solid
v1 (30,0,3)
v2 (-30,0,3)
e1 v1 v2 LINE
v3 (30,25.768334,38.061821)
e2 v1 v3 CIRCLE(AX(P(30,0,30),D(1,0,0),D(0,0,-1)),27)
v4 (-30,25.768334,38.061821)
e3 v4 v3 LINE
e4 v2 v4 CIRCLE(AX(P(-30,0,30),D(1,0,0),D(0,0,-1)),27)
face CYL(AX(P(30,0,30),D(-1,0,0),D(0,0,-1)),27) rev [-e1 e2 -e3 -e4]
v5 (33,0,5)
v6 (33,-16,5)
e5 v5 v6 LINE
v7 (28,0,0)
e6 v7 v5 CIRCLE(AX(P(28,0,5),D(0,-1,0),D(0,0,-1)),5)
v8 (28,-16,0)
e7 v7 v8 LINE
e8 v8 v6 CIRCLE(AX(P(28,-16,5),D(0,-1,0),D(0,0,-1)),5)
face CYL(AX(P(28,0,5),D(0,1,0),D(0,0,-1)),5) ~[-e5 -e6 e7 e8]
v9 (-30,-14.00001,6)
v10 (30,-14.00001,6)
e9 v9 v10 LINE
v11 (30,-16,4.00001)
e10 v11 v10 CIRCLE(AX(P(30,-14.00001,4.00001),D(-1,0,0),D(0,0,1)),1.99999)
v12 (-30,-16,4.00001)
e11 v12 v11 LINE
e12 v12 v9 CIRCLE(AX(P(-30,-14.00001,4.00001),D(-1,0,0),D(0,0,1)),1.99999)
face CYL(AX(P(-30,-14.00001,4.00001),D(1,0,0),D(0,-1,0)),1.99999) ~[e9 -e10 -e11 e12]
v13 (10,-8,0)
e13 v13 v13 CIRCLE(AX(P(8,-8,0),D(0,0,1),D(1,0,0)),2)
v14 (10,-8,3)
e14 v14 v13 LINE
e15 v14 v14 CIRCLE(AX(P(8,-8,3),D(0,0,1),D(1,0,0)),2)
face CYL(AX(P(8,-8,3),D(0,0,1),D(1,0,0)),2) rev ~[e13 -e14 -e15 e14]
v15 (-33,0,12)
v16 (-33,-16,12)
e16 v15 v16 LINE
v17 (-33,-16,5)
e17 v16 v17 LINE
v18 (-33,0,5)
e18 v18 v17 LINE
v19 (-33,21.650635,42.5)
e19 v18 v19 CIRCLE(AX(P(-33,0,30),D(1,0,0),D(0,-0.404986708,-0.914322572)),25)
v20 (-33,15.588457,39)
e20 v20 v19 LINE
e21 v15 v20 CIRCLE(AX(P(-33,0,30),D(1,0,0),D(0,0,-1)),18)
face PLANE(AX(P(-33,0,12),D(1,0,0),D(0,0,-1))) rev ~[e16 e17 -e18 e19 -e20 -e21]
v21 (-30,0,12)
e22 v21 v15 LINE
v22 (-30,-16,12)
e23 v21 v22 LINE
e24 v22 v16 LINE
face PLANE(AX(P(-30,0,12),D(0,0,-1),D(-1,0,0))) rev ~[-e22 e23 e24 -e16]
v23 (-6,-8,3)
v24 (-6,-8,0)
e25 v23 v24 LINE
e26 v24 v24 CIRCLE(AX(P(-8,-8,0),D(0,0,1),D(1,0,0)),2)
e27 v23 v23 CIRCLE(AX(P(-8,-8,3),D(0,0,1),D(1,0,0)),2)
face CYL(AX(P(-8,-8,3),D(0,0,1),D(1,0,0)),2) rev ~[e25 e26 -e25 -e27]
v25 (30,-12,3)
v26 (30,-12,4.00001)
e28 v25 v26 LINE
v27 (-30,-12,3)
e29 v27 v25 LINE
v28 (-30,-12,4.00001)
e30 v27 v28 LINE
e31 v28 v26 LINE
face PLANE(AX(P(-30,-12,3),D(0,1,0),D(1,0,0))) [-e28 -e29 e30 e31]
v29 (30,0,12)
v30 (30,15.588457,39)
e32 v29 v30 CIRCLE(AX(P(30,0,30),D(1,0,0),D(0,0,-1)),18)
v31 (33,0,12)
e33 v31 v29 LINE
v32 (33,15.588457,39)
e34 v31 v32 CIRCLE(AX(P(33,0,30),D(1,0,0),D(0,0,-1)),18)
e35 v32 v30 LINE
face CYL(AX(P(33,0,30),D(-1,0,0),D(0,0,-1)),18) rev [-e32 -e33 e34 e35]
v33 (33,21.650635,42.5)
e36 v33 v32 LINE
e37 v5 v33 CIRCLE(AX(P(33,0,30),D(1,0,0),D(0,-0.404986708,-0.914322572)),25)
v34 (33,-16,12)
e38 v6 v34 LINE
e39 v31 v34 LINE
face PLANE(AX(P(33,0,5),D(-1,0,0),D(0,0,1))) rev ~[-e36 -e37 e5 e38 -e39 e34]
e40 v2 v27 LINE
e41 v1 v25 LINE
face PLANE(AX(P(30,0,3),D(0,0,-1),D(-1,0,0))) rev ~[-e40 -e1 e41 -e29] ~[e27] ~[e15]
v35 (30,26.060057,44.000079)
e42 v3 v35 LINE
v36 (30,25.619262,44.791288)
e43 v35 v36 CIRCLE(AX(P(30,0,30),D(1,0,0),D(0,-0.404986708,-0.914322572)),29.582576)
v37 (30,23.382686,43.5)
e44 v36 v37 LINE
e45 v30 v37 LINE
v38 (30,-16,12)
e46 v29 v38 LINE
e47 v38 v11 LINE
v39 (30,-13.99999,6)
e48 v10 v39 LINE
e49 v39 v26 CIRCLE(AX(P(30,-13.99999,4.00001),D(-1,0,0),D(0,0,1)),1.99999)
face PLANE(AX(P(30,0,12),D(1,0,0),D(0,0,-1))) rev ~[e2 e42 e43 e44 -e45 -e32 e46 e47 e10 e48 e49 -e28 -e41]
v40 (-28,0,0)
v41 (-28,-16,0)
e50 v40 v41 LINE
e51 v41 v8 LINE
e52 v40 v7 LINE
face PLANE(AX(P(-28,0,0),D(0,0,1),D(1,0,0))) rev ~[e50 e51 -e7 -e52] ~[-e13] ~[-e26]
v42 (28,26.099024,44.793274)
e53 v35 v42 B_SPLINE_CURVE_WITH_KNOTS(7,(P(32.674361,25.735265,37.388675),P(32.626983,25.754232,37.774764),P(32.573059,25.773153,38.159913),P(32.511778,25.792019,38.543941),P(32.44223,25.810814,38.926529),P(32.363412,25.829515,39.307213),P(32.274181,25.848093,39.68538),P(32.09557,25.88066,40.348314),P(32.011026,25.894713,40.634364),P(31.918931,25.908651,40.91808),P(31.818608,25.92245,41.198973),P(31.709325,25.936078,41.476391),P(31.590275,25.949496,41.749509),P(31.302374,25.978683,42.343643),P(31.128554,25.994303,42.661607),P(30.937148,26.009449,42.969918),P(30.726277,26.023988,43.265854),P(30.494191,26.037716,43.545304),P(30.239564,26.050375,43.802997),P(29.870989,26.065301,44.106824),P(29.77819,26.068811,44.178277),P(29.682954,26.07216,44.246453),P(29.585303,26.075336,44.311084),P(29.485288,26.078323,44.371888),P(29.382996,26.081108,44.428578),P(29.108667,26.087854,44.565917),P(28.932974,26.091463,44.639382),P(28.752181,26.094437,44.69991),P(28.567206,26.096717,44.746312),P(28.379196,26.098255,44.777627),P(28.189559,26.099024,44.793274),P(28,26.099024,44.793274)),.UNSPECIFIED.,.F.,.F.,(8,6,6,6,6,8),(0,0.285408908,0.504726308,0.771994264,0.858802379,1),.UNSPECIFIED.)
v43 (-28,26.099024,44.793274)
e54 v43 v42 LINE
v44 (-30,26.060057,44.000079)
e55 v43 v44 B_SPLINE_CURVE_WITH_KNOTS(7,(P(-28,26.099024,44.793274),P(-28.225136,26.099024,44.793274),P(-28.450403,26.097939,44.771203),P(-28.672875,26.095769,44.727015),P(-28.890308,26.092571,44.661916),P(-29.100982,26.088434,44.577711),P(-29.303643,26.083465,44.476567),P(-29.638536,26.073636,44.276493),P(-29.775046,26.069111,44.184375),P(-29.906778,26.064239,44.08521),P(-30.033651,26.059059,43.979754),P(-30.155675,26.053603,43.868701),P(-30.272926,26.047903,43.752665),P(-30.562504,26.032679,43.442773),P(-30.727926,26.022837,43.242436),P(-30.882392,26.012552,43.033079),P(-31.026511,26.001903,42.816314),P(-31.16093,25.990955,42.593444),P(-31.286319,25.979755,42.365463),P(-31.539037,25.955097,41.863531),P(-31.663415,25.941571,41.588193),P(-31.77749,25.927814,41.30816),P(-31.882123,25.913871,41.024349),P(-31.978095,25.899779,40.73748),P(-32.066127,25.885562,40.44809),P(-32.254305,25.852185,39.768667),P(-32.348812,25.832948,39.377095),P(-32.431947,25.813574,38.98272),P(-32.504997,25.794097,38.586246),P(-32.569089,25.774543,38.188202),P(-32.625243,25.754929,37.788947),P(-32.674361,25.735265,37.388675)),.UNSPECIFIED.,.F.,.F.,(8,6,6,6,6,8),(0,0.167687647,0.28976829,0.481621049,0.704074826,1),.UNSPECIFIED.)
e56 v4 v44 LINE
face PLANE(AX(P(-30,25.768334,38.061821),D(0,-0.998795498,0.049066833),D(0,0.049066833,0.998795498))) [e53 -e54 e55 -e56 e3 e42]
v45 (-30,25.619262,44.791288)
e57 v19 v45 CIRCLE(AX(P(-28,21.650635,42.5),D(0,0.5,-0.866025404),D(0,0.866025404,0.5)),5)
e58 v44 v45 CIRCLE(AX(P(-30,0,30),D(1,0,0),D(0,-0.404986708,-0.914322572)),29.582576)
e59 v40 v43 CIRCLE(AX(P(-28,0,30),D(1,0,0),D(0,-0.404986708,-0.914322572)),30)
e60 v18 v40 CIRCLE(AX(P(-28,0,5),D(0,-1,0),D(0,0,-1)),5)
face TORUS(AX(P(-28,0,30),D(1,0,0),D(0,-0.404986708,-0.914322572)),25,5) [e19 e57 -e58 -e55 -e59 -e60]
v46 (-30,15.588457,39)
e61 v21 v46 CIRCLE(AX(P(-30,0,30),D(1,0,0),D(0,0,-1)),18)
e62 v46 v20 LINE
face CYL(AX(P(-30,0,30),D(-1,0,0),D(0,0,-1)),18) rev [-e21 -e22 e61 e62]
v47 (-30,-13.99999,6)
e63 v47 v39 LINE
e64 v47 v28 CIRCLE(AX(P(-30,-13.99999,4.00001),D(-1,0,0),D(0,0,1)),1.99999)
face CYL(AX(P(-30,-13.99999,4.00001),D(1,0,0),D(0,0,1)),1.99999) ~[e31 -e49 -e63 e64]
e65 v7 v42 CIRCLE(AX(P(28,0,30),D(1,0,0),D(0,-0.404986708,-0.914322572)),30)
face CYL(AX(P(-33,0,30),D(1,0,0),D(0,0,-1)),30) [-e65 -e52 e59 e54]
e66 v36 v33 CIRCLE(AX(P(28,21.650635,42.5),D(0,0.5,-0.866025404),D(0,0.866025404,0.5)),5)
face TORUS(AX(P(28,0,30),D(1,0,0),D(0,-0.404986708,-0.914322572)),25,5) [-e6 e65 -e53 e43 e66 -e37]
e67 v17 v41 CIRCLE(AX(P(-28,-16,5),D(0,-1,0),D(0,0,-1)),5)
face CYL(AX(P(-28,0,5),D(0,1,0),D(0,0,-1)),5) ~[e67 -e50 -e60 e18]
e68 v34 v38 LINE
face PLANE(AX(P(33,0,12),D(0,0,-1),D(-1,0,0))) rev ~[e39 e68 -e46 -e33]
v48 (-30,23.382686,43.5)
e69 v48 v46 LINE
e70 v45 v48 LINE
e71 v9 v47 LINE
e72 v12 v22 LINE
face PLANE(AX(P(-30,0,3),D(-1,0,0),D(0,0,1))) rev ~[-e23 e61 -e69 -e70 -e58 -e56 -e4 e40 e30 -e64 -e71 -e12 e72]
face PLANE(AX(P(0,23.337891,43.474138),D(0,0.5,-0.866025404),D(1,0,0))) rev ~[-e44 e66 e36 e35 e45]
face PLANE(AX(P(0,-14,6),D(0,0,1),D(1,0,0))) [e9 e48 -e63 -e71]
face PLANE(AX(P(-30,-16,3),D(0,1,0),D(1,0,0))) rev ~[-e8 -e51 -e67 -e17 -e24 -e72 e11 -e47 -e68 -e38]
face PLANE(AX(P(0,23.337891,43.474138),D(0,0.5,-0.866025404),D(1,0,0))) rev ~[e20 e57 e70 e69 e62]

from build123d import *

# Parameters (mm, degrees)
F1_ANGLE    = 120
F2_T1_DEPTH = 60
F3_T2_ANGLE = 167.7805884334
F3_T4_ANGLE = 167.7805884334
F4_DEPTH    = 16
F5_R        = 2
F6_DEPTH    = 3.0010001
F5_W        = 60
F5_H        = 4
F7_DEPTH    = 3
F8_R        = 1.99999


# Not quite as in the source:
# - a fillet or chamfer that OpenCascade refuses, or shapes differently, is made with other operations: its cross-section is extruded or revolved along the edge and cut away or added
# - a fillet or chamfer is up to 0.001 mm smaller than in the source, because OpenCascade refuses the exact size


with BuildPart() as f1:
    # F0 (on Front) → F1 (revolve)
    with BuildSketch(Plane.XZ):
        Polygon((-33, 12), (-33, 0), (33, 0), (33, 12), (30, 12), (30, 3), (-30, 3), (-30, 12), align=None)
    revolve(axis=Axis((7.0132222027, 0, 30), (1, 0, 0)), revolution_arc=F1_ANGLE)

    # F2: chamfer of 3.9 x 6.7549981495 on 1 edges, made by hand

    # F2_s2 → F2_t1 (cut)
    with BuildSketch(Plane.YZ.offset(-30)):
        with BuildLine():
            Line((25.7683341911, 38.0618207012), (26.1129278328, 45.0763059136))
            Line((26.1129278328, 45.0763059136), (23.3826859022, 43.5))
            ThreePointArc((23.3826859022, 43.5), (24.7742012809, 40.7349406562), (25.7683341911, 38.0618207012))
        make_face()
    extrude(amount=F2_T1_DEPTH, mode=Mode.SUBTRACT)

    # F3: fillet of radius 5 on 2 edges, made by hand

    # F3_s1 → F3_t2 (revolve, cut)
    with BuildSketch(Plane(origin=(0, -11.1086546654, 4.9204270168), x_dir=(1, 0, 0), z_dir=(0, -0.9143225722, 0.4049867083))):
        with BuildLine():
            ThreePointArc((28, -2.5703228328), (31.5355339059, -1.1058567387), (33, 2.4296771672))
            Line((33, 2.4296771672), (33, -2.5703228328))
            Line((33, -2.5703228328), (28, -2.5703228328))
        make_face()
    revolve(axis=Axis((33, 0, 30), (1, 0, 0)), revolution_arc=F3_T2_ANGLE, mode=Mode.SUBTRACT)

    # F3_s3 → F3_t4 (revolve, cut)
    with BuildSketch(Plane(origin=(0, -11.1086546654, 4.9204270168), x_dir=(1, 0, 0), z_dir=(0, -0.9143225722, 0.4049867083))):
        with BuildLine():
            ThreePointArc((-33, 2.4296771672), (-31.5355339059, -1.1058567387), (-28, -2.5703228328))
            Line((-28, -2.5703228328), (-33, -2.5703228328))
            Line((-33, -2.5703228328), (-33, 2.4296771672))
        make_face()
    revolve(axis=Axis((-33, 0, 30), (1, 0, 0)), revolution_arc=F3_T4_ANGLE, mode=Mode.SUBTRACT)

    # F4 (add): a face of the model
    f4_faces = [f1.faces().sort_by_distance(p)[0] for p in [
        (0, 0, 2.8599348039),
    ]]
    extrude(f4_faces, amount=F4_DEPTH)

    # F5 (on face) → F6 (cut, through all)
    with BuildSketch(Plane.XY.offset(3)):
        with Locations((-8, -8)):
            Circle(F5_R)
        with Locations((8, -8)):
            Circle(F5_R)
    extrude(amount=-F6_DEPTH, mode=Mode.SUBTRACT)

    # F5 (on face) → F7 (join)
    with BuildSketch(Plane.XY.offset(3)):
        with Locations((0, -14)):
            Rectangle(F5_W, F5_H)
    extrude(amount=F7_DEPTH)

    # F8 (radius 2 in the source; OpenCascade refuses exactly that, so slightly less here)
    f8_edges = [f1.edges().sort_by_distance(p)[0] for p in [
        (0, -16, 6),
        (0, -12, 6),
    ]]
    fillet(f8_edges, radius=F8_R)


solid = f1.part
